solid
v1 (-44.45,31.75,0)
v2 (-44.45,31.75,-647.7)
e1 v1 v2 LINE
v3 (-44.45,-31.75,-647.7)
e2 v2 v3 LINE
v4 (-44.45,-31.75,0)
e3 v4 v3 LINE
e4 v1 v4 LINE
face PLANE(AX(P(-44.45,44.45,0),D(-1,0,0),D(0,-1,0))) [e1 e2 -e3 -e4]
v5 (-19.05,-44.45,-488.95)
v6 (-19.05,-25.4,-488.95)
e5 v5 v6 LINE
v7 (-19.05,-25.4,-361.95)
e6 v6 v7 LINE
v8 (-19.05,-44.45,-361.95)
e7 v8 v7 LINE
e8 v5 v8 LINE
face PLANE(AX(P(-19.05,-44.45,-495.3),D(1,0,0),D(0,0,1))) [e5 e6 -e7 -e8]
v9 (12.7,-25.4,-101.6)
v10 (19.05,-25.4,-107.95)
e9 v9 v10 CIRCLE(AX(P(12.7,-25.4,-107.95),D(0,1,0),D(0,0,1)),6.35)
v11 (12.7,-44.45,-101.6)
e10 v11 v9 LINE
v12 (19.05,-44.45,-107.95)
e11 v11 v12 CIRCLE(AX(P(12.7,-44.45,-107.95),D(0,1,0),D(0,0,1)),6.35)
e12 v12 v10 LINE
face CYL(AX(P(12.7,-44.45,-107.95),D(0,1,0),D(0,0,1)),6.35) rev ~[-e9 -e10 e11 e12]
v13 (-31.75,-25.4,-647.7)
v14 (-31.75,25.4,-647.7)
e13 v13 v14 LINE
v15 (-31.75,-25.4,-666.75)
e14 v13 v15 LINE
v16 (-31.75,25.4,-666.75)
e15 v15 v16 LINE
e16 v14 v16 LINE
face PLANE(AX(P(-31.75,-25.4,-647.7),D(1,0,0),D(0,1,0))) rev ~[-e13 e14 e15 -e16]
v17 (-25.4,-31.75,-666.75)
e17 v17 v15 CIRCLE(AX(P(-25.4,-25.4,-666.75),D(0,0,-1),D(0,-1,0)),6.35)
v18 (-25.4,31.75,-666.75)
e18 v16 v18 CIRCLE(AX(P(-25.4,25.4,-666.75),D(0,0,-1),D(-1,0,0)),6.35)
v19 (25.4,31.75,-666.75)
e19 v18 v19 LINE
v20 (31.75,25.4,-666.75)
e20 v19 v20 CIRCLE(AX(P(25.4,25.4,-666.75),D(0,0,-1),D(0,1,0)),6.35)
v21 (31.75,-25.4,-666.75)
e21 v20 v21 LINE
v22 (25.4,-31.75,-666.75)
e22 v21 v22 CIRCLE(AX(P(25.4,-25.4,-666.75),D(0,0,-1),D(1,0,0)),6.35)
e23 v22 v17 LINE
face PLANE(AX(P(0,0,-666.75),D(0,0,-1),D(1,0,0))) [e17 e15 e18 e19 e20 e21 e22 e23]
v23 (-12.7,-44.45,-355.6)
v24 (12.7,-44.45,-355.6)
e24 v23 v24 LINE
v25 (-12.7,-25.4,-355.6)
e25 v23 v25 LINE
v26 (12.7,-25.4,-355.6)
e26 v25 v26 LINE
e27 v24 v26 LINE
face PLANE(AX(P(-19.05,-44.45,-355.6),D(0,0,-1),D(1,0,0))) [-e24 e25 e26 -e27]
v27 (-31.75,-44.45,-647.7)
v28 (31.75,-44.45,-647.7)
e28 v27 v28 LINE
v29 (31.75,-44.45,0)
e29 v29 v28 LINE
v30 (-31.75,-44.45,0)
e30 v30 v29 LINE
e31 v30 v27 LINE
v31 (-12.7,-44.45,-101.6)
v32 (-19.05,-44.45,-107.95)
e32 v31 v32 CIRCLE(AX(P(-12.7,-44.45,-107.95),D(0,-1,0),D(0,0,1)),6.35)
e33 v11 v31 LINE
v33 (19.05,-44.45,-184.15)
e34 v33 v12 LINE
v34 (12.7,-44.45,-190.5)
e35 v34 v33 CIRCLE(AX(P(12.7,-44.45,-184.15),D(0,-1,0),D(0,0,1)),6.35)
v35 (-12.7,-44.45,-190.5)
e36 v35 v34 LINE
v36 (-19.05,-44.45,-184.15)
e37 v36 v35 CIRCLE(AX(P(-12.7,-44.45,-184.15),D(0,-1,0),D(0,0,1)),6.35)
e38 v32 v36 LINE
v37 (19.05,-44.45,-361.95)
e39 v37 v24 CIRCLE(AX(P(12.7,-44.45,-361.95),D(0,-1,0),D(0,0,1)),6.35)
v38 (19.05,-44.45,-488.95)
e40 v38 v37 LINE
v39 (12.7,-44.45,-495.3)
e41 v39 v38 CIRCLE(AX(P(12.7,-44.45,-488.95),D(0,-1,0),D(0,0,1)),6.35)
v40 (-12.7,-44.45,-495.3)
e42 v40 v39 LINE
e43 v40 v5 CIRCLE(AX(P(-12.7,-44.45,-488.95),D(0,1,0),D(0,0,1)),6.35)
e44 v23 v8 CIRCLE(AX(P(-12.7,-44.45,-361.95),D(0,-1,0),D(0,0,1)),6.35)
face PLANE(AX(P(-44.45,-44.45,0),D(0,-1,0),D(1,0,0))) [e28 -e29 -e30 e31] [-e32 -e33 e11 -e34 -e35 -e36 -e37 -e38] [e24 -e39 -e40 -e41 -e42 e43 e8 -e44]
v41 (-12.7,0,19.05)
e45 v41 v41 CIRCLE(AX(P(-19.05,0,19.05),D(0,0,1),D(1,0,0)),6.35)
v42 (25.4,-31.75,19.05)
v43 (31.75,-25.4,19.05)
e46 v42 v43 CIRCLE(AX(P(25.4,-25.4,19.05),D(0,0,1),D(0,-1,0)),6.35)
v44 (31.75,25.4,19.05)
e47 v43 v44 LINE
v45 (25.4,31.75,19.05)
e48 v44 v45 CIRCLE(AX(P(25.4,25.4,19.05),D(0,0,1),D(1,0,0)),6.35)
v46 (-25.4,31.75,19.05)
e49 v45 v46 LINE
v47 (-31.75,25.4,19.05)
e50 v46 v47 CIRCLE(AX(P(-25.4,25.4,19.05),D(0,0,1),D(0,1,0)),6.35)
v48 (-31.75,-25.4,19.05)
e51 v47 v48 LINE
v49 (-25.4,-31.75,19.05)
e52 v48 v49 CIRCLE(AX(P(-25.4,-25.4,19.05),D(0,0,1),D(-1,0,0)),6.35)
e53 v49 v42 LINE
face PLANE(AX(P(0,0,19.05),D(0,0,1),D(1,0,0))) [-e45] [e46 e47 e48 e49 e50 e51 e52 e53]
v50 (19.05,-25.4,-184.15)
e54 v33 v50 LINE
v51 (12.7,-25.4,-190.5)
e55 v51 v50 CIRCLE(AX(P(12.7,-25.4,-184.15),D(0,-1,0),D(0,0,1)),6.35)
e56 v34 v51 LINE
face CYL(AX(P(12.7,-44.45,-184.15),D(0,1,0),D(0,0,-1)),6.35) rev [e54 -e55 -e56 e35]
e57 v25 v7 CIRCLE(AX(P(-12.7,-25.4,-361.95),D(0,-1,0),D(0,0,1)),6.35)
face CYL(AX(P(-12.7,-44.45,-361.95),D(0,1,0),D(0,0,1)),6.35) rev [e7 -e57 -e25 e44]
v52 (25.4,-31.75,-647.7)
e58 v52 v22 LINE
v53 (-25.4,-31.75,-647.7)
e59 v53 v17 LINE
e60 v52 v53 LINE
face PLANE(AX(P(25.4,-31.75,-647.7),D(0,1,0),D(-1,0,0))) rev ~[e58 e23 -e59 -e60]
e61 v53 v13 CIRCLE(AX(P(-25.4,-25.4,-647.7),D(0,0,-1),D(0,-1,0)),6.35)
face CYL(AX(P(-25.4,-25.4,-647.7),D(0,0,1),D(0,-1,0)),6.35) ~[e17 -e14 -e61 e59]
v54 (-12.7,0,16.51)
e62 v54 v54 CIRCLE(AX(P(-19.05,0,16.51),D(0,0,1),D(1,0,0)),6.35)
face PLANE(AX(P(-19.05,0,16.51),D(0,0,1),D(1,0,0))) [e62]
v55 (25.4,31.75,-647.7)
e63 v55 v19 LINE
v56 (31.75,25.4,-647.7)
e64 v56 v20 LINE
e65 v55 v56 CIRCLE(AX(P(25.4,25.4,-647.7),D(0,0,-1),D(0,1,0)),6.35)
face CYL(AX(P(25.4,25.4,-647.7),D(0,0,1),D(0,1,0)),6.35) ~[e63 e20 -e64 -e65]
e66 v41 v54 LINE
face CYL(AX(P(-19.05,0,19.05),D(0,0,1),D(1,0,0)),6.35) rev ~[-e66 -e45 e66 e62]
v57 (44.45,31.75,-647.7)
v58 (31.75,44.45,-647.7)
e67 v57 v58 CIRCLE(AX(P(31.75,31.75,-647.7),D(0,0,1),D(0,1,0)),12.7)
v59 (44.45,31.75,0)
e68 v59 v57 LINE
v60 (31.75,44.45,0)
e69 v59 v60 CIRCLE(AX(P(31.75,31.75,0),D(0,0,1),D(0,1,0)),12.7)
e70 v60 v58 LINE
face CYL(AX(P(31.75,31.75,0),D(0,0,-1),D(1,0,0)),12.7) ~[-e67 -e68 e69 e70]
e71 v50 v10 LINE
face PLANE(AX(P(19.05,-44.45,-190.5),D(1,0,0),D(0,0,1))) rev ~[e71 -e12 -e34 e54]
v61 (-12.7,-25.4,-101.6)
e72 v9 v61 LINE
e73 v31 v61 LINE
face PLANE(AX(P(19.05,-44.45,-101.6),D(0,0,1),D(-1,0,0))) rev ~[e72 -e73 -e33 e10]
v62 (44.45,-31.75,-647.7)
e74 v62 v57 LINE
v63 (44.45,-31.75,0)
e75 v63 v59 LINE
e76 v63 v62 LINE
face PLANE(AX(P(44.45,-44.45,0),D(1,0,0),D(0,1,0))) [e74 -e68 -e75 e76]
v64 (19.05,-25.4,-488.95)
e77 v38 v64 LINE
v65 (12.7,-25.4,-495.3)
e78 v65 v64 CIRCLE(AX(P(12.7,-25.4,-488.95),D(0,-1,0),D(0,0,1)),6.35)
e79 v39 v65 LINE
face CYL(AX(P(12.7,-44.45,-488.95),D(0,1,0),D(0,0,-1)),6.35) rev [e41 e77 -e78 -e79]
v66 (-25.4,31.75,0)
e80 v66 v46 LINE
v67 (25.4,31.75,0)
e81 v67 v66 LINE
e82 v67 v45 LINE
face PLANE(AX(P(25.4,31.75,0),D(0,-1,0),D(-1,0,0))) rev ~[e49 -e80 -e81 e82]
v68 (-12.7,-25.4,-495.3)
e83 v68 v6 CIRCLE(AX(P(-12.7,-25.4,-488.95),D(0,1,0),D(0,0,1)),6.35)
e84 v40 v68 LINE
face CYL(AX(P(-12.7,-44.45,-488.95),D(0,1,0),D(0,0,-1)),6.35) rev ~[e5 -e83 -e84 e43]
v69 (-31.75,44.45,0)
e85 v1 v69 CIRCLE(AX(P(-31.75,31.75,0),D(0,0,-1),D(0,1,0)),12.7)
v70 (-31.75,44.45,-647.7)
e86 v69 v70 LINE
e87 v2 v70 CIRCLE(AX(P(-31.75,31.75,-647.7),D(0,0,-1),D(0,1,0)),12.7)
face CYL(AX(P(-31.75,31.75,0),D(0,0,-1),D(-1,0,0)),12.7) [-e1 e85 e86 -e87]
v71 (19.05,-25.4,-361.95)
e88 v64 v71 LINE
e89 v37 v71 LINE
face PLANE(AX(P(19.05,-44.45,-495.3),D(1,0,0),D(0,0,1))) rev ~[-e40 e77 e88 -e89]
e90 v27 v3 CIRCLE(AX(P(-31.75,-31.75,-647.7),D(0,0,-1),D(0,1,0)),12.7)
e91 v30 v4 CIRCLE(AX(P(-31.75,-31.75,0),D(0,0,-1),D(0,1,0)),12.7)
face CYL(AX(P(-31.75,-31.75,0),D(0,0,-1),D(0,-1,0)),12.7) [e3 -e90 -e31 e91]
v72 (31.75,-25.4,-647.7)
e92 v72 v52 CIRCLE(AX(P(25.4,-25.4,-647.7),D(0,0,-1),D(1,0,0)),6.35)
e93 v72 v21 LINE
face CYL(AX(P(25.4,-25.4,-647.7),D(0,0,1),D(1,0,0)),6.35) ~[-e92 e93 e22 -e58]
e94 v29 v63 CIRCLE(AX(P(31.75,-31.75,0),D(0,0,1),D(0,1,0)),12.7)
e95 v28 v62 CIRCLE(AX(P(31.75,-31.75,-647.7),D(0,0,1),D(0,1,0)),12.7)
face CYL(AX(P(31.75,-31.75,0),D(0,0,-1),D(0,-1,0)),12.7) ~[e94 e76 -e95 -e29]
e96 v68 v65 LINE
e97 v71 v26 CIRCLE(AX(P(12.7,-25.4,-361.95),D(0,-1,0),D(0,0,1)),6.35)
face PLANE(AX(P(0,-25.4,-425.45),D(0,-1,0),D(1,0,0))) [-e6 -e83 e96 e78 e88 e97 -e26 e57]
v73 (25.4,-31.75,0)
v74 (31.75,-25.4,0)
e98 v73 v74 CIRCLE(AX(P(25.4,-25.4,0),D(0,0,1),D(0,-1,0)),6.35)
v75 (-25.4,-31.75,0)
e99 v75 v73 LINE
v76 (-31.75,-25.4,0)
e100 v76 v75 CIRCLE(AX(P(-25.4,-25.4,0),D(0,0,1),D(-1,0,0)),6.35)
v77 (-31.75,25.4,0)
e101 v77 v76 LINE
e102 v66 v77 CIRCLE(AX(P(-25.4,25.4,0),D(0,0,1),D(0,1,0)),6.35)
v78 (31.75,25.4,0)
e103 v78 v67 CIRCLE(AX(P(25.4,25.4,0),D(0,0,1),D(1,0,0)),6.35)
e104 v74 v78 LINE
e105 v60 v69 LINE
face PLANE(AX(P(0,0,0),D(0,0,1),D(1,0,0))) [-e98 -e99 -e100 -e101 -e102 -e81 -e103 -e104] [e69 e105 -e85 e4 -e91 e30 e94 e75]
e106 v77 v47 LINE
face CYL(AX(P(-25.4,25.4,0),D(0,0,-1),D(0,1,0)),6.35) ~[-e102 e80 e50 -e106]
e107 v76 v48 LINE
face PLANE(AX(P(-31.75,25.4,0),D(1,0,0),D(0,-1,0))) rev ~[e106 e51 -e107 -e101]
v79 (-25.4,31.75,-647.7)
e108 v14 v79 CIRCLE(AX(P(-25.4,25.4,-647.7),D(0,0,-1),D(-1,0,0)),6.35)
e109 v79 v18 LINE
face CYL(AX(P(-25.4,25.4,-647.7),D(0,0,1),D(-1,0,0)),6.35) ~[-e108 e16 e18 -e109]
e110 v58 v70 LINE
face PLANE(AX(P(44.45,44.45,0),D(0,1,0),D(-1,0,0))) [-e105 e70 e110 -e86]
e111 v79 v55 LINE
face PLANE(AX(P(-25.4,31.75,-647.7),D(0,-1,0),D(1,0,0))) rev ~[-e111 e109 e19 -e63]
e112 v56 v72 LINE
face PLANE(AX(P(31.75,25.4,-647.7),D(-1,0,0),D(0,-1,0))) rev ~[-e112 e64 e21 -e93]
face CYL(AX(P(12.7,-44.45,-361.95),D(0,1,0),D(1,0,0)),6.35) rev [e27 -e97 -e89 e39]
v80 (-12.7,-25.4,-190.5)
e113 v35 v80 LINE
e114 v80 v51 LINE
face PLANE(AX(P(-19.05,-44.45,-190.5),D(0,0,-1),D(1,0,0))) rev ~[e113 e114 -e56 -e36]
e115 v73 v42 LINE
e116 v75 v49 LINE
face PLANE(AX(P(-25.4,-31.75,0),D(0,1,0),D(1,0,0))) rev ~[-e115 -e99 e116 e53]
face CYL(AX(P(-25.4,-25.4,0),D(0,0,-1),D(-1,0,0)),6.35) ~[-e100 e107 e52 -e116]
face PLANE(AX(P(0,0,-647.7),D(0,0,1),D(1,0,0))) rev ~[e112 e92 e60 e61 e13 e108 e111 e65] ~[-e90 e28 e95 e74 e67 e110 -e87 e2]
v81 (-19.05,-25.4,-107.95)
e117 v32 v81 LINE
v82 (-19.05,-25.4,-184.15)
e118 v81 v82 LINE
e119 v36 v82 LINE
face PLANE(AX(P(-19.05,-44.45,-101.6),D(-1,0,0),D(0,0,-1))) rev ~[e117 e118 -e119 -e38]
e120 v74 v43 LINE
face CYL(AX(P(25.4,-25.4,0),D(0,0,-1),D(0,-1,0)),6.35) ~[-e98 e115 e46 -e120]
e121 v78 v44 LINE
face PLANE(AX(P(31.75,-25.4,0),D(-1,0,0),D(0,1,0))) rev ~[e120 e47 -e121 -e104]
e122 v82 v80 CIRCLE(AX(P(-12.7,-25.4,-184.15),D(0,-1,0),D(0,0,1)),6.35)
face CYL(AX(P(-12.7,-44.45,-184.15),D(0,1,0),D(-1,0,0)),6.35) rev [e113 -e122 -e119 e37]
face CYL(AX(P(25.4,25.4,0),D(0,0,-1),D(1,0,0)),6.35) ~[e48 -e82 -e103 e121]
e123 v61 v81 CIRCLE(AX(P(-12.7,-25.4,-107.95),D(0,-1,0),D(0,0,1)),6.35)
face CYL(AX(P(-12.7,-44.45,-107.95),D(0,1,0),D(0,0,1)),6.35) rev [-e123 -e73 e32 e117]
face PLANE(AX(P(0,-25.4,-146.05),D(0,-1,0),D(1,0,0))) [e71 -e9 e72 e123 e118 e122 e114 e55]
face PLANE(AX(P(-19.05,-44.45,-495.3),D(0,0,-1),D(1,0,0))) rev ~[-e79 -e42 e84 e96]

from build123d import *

# Parameters (mm, degrees)
F2_DEPTH  = 647.7
F4_DEPTH  = 19.05
F5_R      = 12.7
F6_R      = 6.35
F7_W      = 38.1
F7_H      = 139.7
F8_DEPTH  = 19.05
F9_R      = 6.35
F11_DEPTH = 19.05
F13_DEPTH = 19.05
F14_R     = 6.35
F15_DEPTH = 2.54


with BuildPart() as f2:
    # F1 (on Top) → F2 (new body)
    with BuildSketch(Plane.XY):
        Polygon((-44.45, 19.05), (-44.45, 0), (-44.45, -19.05), (-44.45, -44.45), (-19.05, -44.45), (0, -44.45), (19.05, -44.45), (44.45, -44.45), (44.45, -19.05), (44.45, 0), (44.45, 19.05), (44.45, 44.45), (19.05, 44.45), (0, 44.45), (-19.05, 44.45), (-44.45, 44.45), align=None)
    extrude(amount=-F2_DEPTH)

    # F3 (on face) → F4 (cut)
    with BuildSketch(Plane.XZ.offset(44.45)):
        Polygon((19.05, -101.6), (-19.05, -101.6), (-19.05, -190.5), (0, -190.5), (19.05, -190.5), align=None)
    extrude(amount=-F4_DEPTH, mode=Mode.SUBTRACT)

    # F5
    f5_edges = [f2.edges().sort_by_distance(p)[0] for p in [
        (-44.45, -44.45, -323.85),
        (44.45, -44.45, -323.85),
        (44.45, 44.45, -323.85),
        (-44.45, 44.45, -323.85),
    ]]
    fillet(f5_edges, radius=F5_R)

    # F6
    f6_edges = [f2.edges().sort_by_distance(p)[0] for p in [
        (-19.05, -34.925, -190.5),
        (19.05, -34.925, -190.5),
        (-19.05, -34.925, -101.6),
        (19.05, -34.925, -101.6),
    ]]
    fillet(f6_edges, radius=F6_R)

    # F7 (on face) → F8 (cut)
    with BuildSketch(Plane.XZ.offset(44.45)):
        with Locations((0, -425.45)):
            Rectangle(F7_W, F7_H)
    extrude(amount=-F8_DEPTH, mode=Mode.SUBTRACT)

    # F9
    f9_edges = [f2.edges().sort_by_distance(p)[0] for p in [
        (-19.05, -34.925, -355.6),
        (19.05, -34.925, -355.6),
        (19.05, -34.925, -495.3),
        (-19.05, -34.925, -495.3),
    ]]
    fillet(f9_edges, radius=F9_R)

    # F10 (on face) → F11 (join)
    with BuildSketch(Plane.XY):
        with BuildLine():
            Line((-25.4, -31.75), (25.4, -31.75))
            ThreePointArc((25.4, -31.75), (29.8901280605, -29.8901280605), (31.75, -25.4))
            Line((31.75, -25.4), (31.75, 25.4))
            ThreePointArc((31.75, 25.4), (29.8901280605, 29.8901280605), (25.4, 31.75))
            Line((25.4, 31.75), (-25.4, 31.75))
            ThreePointArc((-25.4, 31.75), (-29.8901280605, 29.8901280605), (-31.75, 25.4))
            Line((-31.75, 25.4), (-31.75, -25.4))
            ThreePointArc((-31.75, -25.4), (-29.8901280605, -29.8901280605), (-25.4, -31.75))
        make_face()
    extrude(amount=F11_DEPTH)

    # F12 (on face) → F13 (join)
    with BuildSketch(Plane(origin=(0, 0, -647.7), x_dir=(1, 0, 0), z_dir=(0, 0, -1))):
        with BuildLine():
            Line((-25.4, -31.75), (25.4, -31.75))
            ThreePointArc((25.4, -31.75), (29.8901280605, -29.8901280605), (31.75, -25.4))
            Line((31.75, -25.4), (31.75, 25.4))
            ThreePointArc((31.75, 25.4), (29.8901280605, 29.8901280605), (25.4, 31.75))
            Line((25.4, 31.75), (-25.4, 31.75))
            ThreePointArc((-25.4, 31.75), (-29.8901280605, 29.8901280605), (-31.75, 25.4))
            Line((-31.75, 25.4), (-31.75, -25.4))
            ThreePointArc((-31.75, -25.4), (-29.8901280605, -29.8901280605), (-25.4, -31.75))
        make_face()
    extrude(amount=F13_DEPTH)

    # F14 (on face) → F15 (cut)
    with BuildSketch(Plane.XY.offset(19.05)):
        with Locations((-19.05, 0)):
            Circle(F14_R)
    extrude(amount=-F15_DEPTH, mode=Mode.SUBTRACT)


solid = f2.part
